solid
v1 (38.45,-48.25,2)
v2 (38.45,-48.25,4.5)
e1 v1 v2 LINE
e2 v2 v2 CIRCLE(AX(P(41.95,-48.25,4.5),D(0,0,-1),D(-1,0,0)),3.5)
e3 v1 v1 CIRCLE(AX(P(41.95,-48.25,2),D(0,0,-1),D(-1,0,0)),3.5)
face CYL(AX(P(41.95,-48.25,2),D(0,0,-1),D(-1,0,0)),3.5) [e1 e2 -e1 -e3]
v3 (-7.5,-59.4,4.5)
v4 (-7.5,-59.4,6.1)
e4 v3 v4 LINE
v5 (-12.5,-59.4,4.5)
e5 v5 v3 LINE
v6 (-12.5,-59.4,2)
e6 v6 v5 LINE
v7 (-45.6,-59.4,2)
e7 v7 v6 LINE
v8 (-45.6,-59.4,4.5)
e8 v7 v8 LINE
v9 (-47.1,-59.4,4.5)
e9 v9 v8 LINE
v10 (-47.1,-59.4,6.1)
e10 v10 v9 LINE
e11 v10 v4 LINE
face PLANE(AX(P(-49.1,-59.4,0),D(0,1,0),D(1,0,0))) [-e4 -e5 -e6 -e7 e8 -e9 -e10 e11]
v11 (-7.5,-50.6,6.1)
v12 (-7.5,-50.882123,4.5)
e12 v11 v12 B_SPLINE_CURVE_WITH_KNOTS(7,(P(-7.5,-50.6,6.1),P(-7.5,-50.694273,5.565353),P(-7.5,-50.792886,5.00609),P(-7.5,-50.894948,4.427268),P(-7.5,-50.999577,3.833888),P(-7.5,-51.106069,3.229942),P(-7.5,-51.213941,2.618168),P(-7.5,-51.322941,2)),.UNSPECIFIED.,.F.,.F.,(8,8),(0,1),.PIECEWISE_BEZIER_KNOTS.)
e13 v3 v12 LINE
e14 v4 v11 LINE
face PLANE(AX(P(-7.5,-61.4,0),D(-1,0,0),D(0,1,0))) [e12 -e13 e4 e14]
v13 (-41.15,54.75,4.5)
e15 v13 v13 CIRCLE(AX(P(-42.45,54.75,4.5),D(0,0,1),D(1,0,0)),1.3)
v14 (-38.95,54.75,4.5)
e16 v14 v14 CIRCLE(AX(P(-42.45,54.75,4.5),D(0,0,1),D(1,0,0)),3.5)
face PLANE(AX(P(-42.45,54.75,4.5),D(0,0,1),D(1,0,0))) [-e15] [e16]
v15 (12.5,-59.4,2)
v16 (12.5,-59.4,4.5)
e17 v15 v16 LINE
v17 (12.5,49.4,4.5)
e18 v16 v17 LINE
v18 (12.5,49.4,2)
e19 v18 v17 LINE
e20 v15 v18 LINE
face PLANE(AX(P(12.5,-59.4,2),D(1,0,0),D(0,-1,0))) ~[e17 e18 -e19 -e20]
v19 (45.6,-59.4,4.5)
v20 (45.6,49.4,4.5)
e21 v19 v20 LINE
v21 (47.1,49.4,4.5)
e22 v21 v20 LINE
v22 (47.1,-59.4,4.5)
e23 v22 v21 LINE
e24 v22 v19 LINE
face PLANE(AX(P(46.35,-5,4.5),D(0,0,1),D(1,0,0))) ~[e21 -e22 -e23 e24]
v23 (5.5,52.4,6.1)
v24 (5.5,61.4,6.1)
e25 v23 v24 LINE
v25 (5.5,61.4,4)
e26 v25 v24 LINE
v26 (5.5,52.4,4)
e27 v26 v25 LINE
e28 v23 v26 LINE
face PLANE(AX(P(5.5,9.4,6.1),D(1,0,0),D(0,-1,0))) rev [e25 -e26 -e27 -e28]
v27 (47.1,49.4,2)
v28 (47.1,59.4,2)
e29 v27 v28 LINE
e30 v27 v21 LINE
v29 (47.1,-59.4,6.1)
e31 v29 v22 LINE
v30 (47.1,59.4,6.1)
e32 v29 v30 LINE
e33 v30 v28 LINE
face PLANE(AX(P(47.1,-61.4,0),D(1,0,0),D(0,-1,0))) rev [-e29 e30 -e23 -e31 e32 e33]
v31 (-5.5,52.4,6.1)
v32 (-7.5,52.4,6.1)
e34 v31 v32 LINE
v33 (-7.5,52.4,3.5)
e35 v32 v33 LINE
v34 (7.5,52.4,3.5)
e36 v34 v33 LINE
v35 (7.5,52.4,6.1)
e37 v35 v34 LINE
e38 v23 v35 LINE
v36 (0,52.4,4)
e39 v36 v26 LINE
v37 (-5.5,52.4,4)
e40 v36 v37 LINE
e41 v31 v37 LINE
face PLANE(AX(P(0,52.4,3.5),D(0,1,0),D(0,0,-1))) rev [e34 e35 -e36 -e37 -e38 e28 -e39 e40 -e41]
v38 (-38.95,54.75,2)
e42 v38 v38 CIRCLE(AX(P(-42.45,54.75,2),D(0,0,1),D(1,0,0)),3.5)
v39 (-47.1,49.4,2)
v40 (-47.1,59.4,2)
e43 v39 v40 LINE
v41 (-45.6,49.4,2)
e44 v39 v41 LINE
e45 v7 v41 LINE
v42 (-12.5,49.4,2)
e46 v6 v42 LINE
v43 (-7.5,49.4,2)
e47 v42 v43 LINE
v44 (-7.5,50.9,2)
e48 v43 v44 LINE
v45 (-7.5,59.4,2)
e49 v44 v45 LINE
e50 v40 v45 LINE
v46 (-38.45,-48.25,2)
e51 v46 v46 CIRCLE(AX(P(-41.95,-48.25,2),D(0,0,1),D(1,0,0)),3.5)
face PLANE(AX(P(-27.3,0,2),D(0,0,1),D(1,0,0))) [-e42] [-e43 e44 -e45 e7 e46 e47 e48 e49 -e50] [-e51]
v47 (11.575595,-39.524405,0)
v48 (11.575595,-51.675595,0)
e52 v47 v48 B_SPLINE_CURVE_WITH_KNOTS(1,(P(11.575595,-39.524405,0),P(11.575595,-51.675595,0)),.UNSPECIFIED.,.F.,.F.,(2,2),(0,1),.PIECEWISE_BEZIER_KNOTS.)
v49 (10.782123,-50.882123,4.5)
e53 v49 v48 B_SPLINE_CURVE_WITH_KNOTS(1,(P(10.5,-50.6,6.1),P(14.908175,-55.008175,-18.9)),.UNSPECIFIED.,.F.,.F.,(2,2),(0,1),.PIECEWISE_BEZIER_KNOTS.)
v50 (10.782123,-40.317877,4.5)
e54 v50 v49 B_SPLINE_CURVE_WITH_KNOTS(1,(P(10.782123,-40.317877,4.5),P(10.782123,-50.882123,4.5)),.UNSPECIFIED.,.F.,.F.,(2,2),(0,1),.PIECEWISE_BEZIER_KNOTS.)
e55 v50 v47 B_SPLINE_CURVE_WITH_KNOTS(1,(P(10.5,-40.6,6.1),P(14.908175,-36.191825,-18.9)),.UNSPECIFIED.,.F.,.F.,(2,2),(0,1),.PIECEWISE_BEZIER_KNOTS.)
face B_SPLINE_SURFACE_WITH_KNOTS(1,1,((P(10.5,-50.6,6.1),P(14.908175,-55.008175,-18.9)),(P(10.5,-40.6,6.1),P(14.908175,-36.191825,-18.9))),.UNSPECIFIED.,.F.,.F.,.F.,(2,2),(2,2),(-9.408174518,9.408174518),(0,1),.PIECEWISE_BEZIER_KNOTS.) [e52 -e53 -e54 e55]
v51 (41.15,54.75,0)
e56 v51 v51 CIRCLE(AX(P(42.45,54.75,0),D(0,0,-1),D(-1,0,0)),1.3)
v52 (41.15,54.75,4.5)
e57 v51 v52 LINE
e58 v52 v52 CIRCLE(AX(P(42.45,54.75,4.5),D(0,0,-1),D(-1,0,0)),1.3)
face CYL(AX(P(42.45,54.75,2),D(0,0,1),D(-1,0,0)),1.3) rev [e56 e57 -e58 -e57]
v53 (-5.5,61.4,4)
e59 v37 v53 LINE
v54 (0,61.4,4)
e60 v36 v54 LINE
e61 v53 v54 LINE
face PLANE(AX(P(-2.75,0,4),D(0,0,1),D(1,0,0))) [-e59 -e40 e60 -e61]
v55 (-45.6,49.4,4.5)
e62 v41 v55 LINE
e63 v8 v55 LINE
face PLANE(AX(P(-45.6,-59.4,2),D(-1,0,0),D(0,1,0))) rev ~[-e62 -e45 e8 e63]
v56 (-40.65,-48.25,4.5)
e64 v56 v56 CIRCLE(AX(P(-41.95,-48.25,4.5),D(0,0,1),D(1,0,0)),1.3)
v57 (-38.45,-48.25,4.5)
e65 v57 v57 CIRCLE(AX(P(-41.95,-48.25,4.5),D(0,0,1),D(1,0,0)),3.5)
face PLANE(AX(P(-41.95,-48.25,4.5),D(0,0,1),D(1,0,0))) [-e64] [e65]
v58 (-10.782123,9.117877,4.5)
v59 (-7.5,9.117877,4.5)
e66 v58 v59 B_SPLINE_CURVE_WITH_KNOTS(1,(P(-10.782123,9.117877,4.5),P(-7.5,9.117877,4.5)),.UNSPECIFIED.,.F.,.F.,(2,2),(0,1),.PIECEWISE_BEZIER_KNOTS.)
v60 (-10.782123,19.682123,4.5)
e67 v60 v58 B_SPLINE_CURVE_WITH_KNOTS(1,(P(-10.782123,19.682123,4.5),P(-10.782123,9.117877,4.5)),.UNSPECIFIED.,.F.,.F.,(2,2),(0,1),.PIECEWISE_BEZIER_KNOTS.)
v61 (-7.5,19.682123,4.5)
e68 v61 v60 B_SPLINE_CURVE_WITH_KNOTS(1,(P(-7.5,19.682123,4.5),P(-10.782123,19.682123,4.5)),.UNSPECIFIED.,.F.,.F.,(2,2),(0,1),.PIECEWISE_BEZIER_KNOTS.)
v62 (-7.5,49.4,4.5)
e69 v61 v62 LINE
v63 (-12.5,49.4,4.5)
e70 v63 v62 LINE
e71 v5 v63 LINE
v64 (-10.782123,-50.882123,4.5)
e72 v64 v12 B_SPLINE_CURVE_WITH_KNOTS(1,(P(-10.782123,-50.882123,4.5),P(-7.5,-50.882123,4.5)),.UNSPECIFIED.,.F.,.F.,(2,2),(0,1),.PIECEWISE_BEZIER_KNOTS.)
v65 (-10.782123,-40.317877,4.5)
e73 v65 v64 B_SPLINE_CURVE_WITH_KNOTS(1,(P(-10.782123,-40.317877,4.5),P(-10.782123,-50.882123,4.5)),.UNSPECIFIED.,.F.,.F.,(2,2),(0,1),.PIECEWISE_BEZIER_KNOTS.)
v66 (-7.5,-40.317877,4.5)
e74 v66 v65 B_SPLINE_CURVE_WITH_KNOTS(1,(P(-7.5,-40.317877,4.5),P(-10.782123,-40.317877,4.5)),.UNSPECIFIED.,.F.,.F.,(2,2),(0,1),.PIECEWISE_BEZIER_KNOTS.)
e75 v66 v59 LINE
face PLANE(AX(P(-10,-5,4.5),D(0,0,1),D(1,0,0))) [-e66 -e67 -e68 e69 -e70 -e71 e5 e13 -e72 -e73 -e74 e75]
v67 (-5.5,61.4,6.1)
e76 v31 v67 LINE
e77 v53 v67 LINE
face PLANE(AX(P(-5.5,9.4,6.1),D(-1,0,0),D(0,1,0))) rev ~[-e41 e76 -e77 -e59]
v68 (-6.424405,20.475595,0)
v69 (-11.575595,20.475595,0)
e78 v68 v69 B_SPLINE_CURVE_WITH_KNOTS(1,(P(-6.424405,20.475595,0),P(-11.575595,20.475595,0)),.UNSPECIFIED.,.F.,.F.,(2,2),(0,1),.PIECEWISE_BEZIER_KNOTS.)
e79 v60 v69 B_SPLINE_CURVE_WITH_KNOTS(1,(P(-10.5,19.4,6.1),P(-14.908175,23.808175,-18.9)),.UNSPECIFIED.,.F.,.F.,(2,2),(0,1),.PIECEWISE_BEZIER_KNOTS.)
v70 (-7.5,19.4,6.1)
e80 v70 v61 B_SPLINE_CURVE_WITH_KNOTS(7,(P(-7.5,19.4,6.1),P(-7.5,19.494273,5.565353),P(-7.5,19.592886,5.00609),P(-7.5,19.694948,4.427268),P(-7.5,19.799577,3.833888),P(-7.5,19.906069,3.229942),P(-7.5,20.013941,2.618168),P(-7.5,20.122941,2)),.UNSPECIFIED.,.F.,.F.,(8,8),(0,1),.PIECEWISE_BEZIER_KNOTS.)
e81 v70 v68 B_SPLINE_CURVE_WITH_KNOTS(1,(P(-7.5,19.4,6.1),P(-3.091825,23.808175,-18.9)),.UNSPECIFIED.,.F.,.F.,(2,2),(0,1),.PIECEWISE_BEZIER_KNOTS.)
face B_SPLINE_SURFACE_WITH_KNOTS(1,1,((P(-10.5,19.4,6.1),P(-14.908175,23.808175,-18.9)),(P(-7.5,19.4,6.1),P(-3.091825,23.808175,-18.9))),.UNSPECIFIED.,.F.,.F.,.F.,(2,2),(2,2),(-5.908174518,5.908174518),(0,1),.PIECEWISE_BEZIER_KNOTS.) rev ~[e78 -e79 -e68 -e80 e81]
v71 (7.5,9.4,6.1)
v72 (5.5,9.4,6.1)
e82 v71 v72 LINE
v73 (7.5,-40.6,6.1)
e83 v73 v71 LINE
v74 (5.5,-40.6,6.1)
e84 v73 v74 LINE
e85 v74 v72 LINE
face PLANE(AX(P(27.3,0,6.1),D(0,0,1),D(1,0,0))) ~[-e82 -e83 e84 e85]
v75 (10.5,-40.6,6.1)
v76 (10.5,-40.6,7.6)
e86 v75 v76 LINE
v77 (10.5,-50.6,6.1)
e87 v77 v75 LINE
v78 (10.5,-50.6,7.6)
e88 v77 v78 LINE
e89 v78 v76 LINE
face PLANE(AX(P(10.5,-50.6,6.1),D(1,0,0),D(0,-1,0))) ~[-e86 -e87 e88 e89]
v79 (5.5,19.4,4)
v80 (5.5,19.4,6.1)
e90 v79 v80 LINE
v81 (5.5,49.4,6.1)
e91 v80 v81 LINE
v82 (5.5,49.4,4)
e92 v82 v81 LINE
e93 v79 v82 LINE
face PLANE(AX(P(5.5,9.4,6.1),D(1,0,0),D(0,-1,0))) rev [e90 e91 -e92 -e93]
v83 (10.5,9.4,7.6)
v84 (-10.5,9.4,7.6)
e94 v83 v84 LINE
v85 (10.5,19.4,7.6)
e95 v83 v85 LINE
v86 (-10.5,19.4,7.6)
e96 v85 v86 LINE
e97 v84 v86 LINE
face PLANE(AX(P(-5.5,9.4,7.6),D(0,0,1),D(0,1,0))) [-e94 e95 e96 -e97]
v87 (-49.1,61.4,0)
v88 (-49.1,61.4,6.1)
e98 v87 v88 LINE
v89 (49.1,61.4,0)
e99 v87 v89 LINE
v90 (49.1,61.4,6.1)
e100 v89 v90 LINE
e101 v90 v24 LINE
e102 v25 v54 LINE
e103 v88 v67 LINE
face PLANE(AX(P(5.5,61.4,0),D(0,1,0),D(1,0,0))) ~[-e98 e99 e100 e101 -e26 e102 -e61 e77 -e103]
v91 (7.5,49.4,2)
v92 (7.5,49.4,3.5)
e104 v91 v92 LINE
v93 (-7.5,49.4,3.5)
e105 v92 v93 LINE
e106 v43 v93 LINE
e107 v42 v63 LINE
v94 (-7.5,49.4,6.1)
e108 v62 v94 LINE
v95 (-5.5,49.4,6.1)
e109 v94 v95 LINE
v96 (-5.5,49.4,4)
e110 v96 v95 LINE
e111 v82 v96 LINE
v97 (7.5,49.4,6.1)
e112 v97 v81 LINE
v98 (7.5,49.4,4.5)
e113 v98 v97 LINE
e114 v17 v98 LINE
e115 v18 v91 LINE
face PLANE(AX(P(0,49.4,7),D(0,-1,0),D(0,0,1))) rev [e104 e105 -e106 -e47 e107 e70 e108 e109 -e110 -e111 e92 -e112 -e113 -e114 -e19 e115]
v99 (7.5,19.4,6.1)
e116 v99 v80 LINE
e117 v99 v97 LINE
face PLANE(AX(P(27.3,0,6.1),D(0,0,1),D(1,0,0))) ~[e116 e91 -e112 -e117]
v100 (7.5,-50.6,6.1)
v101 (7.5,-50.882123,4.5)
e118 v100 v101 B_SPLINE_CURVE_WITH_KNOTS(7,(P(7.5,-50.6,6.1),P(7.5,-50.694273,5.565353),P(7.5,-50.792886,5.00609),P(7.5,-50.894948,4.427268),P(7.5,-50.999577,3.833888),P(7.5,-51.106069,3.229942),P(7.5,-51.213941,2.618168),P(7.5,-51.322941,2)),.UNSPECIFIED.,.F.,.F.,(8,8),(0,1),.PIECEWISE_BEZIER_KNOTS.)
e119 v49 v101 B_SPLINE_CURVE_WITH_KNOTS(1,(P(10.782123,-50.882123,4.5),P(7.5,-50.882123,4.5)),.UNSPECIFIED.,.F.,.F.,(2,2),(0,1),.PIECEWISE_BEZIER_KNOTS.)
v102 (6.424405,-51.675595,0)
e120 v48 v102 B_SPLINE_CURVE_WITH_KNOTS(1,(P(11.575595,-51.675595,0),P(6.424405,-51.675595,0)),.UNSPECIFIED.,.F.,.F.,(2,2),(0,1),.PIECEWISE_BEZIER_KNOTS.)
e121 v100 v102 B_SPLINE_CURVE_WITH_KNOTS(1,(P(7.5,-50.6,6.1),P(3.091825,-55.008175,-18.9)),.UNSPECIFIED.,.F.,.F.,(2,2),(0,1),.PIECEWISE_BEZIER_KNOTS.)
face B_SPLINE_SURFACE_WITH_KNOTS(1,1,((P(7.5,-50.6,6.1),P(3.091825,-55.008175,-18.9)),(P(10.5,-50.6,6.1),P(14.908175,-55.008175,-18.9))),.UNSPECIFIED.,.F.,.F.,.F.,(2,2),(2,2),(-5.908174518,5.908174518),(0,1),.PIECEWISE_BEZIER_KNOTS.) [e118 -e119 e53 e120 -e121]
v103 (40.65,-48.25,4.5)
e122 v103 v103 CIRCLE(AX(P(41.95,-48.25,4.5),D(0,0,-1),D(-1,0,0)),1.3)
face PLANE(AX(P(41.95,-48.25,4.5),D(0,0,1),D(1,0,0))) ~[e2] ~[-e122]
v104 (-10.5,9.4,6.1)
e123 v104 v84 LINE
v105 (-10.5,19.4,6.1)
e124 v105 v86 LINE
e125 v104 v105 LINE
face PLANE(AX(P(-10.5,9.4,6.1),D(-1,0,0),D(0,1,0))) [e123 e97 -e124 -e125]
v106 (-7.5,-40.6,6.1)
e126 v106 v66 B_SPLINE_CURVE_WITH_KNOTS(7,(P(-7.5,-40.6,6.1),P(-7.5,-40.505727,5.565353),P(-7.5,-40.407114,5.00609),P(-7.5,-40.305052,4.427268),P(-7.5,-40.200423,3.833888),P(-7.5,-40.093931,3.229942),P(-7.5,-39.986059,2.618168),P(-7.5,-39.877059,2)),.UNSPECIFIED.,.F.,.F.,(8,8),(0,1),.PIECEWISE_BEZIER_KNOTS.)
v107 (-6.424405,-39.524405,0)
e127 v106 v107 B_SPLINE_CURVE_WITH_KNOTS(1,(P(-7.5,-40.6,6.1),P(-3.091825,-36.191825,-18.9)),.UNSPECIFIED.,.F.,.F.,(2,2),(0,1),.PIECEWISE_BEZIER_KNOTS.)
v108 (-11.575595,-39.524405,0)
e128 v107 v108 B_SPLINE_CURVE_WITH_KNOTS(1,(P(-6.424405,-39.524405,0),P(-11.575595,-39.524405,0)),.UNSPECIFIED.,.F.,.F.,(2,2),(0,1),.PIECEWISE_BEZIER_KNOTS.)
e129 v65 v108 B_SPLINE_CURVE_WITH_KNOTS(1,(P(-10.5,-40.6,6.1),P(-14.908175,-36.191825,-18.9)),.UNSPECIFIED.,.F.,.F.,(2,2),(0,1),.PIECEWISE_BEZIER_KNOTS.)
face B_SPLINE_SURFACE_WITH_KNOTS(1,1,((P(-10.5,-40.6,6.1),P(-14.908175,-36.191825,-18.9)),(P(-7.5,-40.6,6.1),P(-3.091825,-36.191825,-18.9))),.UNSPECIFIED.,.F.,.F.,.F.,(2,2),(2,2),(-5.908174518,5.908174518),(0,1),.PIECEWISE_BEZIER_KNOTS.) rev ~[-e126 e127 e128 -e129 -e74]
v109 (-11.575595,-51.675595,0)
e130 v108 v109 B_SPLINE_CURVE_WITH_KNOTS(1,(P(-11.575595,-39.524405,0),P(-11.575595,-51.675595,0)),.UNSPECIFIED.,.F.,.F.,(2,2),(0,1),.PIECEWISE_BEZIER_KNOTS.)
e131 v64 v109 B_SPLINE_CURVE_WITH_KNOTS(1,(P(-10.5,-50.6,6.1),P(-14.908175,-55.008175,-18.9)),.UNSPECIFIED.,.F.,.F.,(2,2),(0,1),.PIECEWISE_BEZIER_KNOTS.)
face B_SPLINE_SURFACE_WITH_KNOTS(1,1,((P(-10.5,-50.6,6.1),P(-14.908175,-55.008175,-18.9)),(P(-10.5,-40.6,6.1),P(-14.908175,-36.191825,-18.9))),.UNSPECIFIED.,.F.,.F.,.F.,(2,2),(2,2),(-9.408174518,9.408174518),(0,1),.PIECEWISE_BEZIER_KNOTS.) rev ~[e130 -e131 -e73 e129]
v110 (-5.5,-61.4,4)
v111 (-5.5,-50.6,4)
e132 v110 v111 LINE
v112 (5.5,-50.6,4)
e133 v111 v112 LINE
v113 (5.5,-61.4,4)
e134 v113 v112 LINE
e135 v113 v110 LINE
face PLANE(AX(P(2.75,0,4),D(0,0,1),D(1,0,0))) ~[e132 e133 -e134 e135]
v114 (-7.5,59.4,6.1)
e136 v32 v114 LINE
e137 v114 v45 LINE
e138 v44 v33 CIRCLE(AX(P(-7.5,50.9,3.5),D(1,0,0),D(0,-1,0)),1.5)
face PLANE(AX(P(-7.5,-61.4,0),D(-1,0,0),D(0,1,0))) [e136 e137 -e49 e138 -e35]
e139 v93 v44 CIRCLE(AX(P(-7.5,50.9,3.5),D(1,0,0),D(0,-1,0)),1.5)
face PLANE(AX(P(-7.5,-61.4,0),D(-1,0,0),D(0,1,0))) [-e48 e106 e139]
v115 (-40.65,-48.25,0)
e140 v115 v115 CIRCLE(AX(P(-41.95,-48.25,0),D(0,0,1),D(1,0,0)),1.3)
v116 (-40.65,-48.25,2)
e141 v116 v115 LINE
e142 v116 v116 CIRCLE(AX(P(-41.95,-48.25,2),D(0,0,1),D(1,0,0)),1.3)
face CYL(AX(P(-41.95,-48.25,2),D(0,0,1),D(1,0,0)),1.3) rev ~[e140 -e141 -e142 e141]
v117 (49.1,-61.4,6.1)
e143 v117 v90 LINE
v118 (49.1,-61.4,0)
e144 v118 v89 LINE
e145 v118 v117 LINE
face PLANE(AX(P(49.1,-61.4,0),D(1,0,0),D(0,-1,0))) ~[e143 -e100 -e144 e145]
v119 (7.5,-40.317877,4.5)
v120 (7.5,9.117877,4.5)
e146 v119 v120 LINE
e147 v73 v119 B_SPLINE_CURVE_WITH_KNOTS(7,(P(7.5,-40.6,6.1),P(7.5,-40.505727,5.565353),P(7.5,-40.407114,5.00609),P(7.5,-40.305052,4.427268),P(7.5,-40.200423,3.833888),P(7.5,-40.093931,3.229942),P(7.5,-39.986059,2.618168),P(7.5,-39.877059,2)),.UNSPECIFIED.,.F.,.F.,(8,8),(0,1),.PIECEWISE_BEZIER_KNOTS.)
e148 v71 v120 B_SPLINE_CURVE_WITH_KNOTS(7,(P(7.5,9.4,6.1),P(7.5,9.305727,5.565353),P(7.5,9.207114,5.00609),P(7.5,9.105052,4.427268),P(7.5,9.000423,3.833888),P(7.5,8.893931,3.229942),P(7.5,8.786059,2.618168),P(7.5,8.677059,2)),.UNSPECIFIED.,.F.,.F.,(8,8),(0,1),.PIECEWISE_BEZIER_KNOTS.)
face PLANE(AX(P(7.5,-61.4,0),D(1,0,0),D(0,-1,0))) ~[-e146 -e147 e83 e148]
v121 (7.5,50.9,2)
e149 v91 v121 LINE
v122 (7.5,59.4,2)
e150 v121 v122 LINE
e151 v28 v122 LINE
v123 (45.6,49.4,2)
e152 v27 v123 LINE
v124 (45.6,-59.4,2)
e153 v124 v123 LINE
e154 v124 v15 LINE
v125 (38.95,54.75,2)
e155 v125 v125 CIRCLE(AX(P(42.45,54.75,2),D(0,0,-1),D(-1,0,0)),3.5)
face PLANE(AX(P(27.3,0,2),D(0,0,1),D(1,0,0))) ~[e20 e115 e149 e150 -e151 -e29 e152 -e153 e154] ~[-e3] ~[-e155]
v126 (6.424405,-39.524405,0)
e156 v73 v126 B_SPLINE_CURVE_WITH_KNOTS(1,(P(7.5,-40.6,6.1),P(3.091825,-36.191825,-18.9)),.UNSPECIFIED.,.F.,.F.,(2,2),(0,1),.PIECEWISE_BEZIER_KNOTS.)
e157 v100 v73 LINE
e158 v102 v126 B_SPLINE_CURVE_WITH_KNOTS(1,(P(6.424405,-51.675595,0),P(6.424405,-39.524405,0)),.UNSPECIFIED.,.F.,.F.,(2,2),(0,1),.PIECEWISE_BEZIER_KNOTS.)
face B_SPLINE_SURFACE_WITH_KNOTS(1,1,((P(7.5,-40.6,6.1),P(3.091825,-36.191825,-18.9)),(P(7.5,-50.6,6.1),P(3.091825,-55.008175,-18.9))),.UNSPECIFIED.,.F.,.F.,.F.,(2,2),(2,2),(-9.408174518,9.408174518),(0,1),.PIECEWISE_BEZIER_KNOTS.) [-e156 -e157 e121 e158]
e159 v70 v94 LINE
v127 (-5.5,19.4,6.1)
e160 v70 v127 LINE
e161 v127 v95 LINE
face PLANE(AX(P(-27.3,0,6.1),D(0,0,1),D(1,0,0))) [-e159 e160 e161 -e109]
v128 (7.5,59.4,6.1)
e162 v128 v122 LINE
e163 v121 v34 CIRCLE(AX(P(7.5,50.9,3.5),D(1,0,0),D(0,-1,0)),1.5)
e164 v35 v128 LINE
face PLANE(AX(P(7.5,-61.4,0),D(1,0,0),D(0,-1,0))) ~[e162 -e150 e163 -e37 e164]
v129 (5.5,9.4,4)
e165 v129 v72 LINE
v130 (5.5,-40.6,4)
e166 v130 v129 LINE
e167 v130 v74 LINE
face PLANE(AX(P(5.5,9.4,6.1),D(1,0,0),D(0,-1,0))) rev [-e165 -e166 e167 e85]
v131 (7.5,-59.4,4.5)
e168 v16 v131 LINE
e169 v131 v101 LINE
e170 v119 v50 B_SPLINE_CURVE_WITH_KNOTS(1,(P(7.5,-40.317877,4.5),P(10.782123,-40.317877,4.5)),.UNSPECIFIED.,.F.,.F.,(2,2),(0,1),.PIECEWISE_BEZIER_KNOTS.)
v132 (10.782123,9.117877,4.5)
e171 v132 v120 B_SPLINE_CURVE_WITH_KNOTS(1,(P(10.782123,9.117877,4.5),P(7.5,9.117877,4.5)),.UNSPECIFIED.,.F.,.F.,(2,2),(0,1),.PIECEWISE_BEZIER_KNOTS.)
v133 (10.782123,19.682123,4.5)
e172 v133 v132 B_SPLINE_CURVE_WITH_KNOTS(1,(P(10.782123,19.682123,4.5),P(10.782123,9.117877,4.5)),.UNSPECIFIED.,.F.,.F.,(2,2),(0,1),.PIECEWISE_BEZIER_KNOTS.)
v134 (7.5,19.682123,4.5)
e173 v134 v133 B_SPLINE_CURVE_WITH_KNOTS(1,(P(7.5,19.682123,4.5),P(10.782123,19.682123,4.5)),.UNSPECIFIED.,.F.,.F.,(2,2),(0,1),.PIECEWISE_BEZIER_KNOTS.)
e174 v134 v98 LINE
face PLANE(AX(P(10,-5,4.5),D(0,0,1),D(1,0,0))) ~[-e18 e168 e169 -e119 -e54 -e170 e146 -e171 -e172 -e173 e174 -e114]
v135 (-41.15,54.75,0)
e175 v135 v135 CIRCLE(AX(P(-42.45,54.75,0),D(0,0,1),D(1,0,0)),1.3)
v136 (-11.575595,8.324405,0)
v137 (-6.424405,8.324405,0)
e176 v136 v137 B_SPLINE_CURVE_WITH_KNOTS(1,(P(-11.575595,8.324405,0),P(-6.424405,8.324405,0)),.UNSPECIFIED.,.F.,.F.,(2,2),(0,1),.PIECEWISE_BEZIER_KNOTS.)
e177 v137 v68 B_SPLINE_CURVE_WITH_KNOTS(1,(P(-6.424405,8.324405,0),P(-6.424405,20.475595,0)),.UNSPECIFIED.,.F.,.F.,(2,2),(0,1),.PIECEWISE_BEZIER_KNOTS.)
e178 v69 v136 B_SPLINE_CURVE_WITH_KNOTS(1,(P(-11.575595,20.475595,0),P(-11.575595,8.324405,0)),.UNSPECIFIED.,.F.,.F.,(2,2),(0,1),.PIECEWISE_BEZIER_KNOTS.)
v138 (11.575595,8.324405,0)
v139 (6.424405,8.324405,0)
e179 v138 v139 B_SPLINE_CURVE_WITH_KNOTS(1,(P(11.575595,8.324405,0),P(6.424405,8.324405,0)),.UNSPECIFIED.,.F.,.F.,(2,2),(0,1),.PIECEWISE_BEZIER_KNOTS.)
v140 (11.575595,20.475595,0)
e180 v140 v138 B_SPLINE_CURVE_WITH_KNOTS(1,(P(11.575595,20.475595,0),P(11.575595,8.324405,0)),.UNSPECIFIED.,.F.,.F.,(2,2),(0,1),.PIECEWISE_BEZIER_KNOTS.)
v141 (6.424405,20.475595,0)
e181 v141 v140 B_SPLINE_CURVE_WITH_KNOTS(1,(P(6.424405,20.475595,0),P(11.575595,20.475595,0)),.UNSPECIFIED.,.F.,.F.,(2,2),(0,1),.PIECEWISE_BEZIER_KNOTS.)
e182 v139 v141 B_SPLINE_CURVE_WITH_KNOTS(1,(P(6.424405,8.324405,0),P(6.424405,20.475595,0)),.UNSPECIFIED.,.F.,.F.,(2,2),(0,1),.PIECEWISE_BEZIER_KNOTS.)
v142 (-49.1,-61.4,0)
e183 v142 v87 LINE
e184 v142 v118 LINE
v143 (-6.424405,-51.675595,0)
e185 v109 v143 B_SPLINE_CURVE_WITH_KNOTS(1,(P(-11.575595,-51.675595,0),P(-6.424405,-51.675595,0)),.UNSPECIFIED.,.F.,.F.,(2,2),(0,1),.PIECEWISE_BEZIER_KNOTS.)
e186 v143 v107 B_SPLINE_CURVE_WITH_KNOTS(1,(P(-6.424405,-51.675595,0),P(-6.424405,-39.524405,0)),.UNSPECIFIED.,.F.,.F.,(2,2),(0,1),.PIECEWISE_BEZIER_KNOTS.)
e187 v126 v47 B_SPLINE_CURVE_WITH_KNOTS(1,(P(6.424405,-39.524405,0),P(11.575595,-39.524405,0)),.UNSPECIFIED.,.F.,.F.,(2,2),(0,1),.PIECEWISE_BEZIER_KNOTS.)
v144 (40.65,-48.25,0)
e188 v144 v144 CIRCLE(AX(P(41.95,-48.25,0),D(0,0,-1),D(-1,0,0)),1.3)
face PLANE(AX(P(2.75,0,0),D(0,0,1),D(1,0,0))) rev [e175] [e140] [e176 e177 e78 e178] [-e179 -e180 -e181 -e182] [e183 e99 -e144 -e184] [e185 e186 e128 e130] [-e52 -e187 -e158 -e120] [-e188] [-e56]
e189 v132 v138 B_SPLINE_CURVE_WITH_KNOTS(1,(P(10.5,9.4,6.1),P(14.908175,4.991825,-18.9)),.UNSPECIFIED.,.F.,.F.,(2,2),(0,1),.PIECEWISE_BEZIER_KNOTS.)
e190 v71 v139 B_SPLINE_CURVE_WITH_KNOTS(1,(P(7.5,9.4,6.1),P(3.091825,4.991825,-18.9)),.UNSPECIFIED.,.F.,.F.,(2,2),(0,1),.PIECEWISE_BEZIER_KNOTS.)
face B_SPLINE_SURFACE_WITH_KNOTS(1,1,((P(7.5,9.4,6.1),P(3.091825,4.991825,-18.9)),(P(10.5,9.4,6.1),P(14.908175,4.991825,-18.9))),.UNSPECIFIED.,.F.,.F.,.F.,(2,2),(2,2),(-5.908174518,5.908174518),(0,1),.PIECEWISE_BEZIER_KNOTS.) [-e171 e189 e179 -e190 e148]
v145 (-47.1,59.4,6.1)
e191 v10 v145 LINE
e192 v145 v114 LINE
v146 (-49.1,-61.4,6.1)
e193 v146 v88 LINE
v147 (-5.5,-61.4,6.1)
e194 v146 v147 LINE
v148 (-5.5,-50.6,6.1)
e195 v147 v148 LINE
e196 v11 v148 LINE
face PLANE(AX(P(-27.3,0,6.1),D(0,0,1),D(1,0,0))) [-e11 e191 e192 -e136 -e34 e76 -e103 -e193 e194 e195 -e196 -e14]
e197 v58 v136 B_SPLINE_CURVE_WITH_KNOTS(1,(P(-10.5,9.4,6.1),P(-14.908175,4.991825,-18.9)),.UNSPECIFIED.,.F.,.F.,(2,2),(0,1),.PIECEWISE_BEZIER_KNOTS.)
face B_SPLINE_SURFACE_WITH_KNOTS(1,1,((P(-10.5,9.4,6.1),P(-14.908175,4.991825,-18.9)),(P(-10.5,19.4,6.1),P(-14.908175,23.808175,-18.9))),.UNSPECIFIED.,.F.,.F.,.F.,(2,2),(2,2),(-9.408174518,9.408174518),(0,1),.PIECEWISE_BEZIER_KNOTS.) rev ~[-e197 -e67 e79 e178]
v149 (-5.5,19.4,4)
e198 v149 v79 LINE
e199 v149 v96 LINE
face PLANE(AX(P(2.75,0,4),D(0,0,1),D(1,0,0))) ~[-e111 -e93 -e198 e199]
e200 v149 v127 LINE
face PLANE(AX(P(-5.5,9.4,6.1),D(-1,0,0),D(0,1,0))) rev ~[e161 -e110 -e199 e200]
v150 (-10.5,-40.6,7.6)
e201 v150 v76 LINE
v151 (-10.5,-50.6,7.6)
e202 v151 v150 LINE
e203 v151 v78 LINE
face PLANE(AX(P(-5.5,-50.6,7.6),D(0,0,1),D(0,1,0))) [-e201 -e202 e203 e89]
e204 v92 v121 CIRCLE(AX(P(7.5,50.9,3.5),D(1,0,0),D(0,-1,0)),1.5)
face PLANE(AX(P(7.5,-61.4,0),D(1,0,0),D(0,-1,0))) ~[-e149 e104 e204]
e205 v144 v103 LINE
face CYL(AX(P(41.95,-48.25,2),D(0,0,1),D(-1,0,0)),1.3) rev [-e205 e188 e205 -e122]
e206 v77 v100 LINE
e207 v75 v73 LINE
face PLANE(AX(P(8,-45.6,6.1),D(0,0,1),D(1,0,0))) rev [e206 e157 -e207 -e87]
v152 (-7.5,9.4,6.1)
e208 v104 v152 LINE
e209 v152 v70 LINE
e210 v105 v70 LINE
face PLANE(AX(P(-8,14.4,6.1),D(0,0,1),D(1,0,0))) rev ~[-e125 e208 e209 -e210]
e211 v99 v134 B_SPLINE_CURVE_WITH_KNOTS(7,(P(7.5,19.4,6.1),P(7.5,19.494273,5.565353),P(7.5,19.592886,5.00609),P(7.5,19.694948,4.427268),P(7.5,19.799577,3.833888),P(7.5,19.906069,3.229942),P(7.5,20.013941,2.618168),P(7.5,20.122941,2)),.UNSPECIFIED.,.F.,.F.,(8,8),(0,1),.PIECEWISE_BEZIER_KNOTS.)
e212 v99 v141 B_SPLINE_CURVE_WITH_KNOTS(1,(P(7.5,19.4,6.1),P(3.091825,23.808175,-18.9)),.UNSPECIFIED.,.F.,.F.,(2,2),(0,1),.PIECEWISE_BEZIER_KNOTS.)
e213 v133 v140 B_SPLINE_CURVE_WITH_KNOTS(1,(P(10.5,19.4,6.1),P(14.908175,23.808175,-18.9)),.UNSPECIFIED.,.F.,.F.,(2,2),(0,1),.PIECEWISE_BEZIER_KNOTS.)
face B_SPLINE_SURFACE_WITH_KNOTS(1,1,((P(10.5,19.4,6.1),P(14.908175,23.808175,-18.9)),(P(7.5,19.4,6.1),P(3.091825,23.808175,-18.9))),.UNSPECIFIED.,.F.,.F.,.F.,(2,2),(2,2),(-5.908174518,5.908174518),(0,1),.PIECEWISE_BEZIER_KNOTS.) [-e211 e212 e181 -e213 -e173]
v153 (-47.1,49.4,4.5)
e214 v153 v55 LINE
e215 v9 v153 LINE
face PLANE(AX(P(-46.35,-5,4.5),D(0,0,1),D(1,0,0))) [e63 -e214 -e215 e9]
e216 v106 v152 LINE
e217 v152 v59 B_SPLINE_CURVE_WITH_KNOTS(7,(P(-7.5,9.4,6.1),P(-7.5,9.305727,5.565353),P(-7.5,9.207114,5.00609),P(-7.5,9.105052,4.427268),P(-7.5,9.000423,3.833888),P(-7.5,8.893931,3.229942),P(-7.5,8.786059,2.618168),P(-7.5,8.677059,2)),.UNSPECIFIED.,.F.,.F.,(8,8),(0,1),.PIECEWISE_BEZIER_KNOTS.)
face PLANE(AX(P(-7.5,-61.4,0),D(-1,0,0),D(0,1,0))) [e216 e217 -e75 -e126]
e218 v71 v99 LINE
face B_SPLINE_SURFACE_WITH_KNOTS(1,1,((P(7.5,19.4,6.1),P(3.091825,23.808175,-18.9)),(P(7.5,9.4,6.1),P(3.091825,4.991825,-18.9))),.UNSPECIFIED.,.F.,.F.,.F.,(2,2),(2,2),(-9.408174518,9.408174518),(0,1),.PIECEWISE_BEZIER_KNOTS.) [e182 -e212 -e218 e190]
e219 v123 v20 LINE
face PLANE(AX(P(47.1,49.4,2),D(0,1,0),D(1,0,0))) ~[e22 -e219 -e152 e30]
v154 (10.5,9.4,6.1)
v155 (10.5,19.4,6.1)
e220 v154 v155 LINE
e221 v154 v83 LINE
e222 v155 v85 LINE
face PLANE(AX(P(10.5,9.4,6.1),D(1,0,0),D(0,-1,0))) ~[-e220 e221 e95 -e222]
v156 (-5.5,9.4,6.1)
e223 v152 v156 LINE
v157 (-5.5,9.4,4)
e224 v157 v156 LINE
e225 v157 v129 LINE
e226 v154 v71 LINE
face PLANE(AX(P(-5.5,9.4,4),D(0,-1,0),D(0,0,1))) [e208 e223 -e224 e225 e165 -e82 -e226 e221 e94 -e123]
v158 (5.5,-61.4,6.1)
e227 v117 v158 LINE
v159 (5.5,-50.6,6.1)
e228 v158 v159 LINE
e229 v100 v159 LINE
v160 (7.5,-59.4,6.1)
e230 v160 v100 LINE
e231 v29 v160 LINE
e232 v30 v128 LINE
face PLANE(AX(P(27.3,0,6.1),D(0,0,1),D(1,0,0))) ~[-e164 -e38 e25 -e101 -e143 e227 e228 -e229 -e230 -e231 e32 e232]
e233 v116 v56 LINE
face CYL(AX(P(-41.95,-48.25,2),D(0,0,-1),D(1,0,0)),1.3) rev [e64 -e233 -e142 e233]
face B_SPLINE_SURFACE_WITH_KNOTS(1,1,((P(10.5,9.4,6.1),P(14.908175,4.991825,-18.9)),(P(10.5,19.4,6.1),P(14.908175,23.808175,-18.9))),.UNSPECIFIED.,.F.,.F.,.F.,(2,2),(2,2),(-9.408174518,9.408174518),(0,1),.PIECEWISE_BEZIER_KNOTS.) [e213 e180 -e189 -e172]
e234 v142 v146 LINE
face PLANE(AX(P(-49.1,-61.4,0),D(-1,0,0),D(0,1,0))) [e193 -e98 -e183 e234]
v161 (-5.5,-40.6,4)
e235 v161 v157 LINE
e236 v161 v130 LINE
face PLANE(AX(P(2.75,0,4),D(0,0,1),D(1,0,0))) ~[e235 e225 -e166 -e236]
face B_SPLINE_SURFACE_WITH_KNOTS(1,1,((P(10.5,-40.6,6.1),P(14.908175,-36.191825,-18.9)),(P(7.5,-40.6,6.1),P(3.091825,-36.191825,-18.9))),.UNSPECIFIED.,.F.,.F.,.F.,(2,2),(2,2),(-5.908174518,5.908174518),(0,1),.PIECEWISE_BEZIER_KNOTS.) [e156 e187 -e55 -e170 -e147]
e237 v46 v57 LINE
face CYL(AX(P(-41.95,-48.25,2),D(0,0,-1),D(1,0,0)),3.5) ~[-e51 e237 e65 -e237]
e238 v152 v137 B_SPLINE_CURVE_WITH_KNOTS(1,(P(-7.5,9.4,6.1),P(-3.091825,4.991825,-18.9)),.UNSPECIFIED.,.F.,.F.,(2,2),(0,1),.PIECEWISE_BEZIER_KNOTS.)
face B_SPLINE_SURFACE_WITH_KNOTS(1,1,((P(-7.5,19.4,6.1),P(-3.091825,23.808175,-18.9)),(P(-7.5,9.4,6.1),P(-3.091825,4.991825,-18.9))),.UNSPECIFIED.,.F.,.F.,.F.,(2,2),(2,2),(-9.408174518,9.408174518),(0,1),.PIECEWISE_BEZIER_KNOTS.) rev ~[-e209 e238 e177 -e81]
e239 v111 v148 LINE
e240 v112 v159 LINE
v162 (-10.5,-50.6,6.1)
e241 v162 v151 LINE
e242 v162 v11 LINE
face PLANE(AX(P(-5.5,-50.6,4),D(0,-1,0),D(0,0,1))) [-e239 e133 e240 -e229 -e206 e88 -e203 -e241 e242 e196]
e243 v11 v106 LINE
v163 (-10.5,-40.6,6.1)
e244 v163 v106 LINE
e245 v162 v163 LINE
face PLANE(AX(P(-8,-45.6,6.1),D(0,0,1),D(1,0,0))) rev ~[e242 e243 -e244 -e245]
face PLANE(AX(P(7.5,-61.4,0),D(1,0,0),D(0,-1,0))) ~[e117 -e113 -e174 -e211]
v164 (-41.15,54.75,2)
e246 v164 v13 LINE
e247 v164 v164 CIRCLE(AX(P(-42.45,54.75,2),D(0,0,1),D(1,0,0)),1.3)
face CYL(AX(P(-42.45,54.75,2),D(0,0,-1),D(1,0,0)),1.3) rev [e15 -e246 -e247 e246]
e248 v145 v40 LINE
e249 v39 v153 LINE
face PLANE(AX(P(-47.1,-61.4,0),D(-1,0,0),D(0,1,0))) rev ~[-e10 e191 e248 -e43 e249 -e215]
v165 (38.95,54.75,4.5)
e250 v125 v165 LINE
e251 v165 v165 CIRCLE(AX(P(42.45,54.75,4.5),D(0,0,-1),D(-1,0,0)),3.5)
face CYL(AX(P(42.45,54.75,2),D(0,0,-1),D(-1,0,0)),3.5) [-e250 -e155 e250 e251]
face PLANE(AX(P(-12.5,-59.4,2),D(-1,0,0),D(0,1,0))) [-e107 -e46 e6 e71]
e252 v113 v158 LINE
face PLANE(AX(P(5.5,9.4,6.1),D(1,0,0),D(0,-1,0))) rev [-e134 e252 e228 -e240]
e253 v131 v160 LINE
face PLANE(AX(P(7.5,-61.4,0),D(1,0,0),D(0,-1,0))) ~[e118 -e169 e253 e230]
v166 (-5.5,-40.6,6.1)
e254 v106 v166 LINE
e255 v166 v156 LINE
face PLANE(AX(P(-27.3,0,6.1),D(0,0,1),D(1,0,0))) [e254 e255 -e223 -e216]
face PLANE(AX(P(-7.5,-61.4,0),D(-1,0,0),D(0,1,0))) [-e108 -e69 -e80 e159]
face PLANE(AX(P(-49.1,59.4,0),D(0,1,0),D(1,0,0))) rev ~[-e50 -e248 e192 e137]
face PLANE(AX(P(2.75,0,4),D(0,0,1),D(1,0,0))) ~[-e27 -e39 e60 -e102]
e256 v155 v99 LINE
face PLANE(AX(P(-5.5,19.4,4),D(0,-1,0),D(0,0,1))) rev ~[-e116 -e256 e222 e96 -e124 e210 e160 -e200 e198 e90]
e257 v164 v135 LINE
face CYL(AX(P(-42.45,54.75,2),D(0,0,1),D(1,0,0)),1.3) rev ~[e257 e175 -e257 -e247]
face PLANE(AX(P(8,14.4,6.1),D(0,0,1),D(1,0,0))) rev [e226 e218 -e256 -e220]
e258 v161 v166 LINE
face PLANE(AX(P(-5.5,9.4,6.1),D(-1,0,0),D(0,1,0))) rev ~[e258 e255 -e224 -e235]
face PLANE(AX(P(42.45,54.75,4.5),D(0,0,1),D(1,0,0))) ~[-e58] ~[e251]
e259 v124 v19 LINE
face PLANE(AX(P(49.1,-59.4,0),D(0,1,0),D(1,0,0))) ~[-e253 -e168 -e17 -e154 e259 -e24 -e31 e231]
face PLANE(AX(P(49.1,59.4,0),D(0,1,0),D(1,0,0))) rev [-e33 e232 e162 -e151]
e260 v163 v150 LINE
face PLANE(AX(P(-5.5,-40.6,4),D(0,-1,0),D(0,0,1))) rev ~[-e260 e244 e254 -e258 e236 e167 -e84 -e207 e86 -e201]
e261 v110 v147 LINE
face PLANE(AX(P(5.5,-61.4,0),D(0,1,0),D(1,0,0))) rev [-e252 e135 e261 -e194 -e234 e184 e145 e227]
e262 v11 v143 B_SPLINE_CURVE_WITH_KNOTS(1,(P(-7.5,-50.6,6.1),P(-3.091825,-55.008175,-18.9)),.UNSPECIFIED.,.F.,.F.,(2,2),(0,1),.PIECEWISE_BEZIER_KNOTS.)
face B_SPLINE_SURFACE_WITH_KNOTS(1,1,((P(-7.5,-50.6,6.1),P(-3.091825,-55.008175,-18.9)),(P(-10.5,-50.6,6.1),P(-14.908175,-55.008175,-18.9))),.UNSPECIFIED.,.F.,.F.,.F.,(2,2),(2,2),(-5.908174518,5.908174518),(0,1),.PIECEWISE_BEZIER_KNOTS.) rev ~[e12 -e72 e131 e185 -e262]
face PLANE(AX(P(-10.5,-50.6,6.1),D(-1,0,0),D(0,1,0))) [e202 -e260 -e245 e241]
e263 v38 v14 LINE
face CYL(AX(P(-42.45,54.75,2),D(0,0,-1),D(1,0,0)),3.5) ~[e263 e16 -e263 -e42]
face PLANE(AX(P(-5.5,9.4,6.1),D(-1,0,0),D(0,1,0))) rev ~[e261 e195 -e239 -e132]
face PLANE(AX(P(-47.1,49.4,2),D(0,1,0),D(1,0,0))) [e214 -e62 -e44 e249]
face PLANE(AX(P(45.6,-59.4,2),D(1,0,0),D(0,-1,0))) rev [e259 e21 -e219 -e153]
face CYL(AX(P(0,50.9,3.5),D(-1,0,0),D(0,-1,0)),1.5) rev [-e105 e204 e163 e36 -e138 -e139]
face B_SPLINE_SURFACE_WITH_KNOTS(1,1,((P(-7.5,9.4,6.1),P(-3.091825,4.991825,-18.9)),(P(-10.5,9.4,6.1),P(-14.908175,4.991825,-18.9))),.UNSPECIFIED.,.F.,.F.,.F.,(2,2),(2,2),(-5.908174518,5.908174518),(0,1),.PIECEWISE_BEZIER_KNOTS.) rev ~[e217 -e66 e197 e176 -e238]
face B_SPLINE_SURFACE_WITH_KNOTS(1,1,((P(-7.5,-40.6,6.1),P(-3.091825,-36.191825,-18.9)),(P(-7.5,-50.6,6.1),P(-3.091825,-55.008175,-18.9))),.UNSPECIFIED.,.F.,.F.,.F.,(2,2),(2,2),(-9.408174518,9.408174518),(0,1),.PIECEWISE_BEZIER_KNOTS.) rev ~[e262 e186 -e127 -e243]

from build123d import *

# Parameters (mm, degrees)
F0_W      = 43.6
F0_H      = 122.8
F1_DEPTH  = 6.1
F2_T      = -2
F3_R      = 3.5
F3_R_2    = 1.3
F4_DEPTH  = 2.5
F5_DEPTH  = 2.001
F6_W      = 1.5
F6_H      = 108.8
F6_W_2    = 5
F7_DEPTH  = 2.5
F8_W      = 5
F8_H      = 10
F9_DEPTH  = 1.5
F10_W     = 3
F10_H     = 10
F11_DEPTH = 25
F11_TAPER = -10
F0_W_2    = 5.5
F12_DEPTH = 4
F14_DEPTH = 15
F16_W     = 10
F16_H     = 3.6
F17_DEPTH = 11


with BuildPart() as f1:
    # F0 (on Top) → F1 (new body)
    with BuildSketch(Plane.XY):
        with Locations((-27.3, 0)):
            Rectangle(F0_W, F0_H)
    extrude(amount=F1_DEPTH)

    # F2
    f2_openings = [f1.faces().sort_by_distance(p)[0] for p in [
        (-27.3, 0, 6.1),
    ]]
    offset(amount=F2_T, openings=f2_openings)

    # F3 (on face) → F4 (join, through all)
    with BuildSketch(Plane.XY.offset(2)):
        with Locations((-42.45, 54.75)):
            Circle(F3_R)
        with Locations((-42.45, 54.75)):
            Circle(F3_R_2, mode=Mode.SUBTRACT)
        with Locations((-41.95, -48.25)):
            Circle(F3_R)
        with Locations((-41.95, -48.25)):
            Circle(F3_R_2, mode=Mode.SUBTRACT)
    extrude(amount=F4_DEPTH)

    # F5 (cut, through all): faces of the model
    f5_faces = [f1.faces().sort_by_distance(p)[0] for p in [
        (-42.45, 54.75, 2),
        (-41.95, -48.25, 2),
    ]]
    extrude(f5_faces, amount=-F5_DEPTH, mode=Mode.SUBTRACT)

    # F6 (on face) → F7 (join, through all)
    with BuildSketch(Plane.XY.offset(2)):
        with Locations((-46.35, -5)):
            Rectangle(F6_W, F6_H)
        with Locations((-10, -5)):
            Rectangle(F6_W_2, F6_H)
    extrude(amount=F7_DEPTH)

    # F8 (on face) → F9 (join)
    with BuildSketch(Plane.XY.offset(6.1)):
        with Locations((-8, 14.4)):
            Rectangle(F8_W, F8_H)
        with Locations((-8, -45.6)):
            Rectangle(F8_W, F8_H)
    extrude(amount=F9_DEPTH)

    # F10 (on face) → F11 (cut)
    with BuildSketch(Plane(origin=(0, 0, 6.1), x_dir=(1, 0, 0), z_dir=(0, 0, -1))):
        with Locations((-9, -14.4)):
            Rectangle(F10_W, F10_H)
        with Locations((-9, 45.6)):
            Rectangle(F10_W, F10_H)
    extrude(amount=F11_DEPTH, taper=F11_TAPER, mode=Mode.SUBTRACT)

    # F0 (on Top) → F12 (join)
    with BuildSketch(Plane.XY):
        with Locations((-2.75, 0)):
            Rectangle(F0_W_2, F0_H)
    extrude(amount=F12_DEPTH)

    # F13 (on face) → F14 (cut)
    with BuildSketch(Plane.YZ):
        with BuildLine():
            Line((49.4, 7), (49.4, 4))
            Line((49.4, 4), (49.4, 3.5))
            ThreePointArc((49.4, 3.5), (50.9, 2), (52.4, 3.5))
            Line((52.4, 3.5), (52.4, 4))
            Line((52.4, 4), (52.4, 7))
            Line((52.4, 7), (49.4, 7))
        make_face()
    extrude(amount=-F14_DEPTH, mode=Mode.SUBTRACT)

    # F15: F1 across plane


with BuildPart() as f1_1:
    add(f1.part)
    add(f1.part.mirror(Plane.YZ))

    # F16 (on face) → F17 (join, through all)
    with BuildSketch(Plane.YZ.offset(-5.5)):
        with Locations((14.4, 5.8)):
            Rectangle(F16_W, F16_H)
        with Locations((-45.6, 5.8)):
            Rectangle(F16_W, F16_H)
    extrude(amount=F17_DEPTH)


solid = f1_1.part
